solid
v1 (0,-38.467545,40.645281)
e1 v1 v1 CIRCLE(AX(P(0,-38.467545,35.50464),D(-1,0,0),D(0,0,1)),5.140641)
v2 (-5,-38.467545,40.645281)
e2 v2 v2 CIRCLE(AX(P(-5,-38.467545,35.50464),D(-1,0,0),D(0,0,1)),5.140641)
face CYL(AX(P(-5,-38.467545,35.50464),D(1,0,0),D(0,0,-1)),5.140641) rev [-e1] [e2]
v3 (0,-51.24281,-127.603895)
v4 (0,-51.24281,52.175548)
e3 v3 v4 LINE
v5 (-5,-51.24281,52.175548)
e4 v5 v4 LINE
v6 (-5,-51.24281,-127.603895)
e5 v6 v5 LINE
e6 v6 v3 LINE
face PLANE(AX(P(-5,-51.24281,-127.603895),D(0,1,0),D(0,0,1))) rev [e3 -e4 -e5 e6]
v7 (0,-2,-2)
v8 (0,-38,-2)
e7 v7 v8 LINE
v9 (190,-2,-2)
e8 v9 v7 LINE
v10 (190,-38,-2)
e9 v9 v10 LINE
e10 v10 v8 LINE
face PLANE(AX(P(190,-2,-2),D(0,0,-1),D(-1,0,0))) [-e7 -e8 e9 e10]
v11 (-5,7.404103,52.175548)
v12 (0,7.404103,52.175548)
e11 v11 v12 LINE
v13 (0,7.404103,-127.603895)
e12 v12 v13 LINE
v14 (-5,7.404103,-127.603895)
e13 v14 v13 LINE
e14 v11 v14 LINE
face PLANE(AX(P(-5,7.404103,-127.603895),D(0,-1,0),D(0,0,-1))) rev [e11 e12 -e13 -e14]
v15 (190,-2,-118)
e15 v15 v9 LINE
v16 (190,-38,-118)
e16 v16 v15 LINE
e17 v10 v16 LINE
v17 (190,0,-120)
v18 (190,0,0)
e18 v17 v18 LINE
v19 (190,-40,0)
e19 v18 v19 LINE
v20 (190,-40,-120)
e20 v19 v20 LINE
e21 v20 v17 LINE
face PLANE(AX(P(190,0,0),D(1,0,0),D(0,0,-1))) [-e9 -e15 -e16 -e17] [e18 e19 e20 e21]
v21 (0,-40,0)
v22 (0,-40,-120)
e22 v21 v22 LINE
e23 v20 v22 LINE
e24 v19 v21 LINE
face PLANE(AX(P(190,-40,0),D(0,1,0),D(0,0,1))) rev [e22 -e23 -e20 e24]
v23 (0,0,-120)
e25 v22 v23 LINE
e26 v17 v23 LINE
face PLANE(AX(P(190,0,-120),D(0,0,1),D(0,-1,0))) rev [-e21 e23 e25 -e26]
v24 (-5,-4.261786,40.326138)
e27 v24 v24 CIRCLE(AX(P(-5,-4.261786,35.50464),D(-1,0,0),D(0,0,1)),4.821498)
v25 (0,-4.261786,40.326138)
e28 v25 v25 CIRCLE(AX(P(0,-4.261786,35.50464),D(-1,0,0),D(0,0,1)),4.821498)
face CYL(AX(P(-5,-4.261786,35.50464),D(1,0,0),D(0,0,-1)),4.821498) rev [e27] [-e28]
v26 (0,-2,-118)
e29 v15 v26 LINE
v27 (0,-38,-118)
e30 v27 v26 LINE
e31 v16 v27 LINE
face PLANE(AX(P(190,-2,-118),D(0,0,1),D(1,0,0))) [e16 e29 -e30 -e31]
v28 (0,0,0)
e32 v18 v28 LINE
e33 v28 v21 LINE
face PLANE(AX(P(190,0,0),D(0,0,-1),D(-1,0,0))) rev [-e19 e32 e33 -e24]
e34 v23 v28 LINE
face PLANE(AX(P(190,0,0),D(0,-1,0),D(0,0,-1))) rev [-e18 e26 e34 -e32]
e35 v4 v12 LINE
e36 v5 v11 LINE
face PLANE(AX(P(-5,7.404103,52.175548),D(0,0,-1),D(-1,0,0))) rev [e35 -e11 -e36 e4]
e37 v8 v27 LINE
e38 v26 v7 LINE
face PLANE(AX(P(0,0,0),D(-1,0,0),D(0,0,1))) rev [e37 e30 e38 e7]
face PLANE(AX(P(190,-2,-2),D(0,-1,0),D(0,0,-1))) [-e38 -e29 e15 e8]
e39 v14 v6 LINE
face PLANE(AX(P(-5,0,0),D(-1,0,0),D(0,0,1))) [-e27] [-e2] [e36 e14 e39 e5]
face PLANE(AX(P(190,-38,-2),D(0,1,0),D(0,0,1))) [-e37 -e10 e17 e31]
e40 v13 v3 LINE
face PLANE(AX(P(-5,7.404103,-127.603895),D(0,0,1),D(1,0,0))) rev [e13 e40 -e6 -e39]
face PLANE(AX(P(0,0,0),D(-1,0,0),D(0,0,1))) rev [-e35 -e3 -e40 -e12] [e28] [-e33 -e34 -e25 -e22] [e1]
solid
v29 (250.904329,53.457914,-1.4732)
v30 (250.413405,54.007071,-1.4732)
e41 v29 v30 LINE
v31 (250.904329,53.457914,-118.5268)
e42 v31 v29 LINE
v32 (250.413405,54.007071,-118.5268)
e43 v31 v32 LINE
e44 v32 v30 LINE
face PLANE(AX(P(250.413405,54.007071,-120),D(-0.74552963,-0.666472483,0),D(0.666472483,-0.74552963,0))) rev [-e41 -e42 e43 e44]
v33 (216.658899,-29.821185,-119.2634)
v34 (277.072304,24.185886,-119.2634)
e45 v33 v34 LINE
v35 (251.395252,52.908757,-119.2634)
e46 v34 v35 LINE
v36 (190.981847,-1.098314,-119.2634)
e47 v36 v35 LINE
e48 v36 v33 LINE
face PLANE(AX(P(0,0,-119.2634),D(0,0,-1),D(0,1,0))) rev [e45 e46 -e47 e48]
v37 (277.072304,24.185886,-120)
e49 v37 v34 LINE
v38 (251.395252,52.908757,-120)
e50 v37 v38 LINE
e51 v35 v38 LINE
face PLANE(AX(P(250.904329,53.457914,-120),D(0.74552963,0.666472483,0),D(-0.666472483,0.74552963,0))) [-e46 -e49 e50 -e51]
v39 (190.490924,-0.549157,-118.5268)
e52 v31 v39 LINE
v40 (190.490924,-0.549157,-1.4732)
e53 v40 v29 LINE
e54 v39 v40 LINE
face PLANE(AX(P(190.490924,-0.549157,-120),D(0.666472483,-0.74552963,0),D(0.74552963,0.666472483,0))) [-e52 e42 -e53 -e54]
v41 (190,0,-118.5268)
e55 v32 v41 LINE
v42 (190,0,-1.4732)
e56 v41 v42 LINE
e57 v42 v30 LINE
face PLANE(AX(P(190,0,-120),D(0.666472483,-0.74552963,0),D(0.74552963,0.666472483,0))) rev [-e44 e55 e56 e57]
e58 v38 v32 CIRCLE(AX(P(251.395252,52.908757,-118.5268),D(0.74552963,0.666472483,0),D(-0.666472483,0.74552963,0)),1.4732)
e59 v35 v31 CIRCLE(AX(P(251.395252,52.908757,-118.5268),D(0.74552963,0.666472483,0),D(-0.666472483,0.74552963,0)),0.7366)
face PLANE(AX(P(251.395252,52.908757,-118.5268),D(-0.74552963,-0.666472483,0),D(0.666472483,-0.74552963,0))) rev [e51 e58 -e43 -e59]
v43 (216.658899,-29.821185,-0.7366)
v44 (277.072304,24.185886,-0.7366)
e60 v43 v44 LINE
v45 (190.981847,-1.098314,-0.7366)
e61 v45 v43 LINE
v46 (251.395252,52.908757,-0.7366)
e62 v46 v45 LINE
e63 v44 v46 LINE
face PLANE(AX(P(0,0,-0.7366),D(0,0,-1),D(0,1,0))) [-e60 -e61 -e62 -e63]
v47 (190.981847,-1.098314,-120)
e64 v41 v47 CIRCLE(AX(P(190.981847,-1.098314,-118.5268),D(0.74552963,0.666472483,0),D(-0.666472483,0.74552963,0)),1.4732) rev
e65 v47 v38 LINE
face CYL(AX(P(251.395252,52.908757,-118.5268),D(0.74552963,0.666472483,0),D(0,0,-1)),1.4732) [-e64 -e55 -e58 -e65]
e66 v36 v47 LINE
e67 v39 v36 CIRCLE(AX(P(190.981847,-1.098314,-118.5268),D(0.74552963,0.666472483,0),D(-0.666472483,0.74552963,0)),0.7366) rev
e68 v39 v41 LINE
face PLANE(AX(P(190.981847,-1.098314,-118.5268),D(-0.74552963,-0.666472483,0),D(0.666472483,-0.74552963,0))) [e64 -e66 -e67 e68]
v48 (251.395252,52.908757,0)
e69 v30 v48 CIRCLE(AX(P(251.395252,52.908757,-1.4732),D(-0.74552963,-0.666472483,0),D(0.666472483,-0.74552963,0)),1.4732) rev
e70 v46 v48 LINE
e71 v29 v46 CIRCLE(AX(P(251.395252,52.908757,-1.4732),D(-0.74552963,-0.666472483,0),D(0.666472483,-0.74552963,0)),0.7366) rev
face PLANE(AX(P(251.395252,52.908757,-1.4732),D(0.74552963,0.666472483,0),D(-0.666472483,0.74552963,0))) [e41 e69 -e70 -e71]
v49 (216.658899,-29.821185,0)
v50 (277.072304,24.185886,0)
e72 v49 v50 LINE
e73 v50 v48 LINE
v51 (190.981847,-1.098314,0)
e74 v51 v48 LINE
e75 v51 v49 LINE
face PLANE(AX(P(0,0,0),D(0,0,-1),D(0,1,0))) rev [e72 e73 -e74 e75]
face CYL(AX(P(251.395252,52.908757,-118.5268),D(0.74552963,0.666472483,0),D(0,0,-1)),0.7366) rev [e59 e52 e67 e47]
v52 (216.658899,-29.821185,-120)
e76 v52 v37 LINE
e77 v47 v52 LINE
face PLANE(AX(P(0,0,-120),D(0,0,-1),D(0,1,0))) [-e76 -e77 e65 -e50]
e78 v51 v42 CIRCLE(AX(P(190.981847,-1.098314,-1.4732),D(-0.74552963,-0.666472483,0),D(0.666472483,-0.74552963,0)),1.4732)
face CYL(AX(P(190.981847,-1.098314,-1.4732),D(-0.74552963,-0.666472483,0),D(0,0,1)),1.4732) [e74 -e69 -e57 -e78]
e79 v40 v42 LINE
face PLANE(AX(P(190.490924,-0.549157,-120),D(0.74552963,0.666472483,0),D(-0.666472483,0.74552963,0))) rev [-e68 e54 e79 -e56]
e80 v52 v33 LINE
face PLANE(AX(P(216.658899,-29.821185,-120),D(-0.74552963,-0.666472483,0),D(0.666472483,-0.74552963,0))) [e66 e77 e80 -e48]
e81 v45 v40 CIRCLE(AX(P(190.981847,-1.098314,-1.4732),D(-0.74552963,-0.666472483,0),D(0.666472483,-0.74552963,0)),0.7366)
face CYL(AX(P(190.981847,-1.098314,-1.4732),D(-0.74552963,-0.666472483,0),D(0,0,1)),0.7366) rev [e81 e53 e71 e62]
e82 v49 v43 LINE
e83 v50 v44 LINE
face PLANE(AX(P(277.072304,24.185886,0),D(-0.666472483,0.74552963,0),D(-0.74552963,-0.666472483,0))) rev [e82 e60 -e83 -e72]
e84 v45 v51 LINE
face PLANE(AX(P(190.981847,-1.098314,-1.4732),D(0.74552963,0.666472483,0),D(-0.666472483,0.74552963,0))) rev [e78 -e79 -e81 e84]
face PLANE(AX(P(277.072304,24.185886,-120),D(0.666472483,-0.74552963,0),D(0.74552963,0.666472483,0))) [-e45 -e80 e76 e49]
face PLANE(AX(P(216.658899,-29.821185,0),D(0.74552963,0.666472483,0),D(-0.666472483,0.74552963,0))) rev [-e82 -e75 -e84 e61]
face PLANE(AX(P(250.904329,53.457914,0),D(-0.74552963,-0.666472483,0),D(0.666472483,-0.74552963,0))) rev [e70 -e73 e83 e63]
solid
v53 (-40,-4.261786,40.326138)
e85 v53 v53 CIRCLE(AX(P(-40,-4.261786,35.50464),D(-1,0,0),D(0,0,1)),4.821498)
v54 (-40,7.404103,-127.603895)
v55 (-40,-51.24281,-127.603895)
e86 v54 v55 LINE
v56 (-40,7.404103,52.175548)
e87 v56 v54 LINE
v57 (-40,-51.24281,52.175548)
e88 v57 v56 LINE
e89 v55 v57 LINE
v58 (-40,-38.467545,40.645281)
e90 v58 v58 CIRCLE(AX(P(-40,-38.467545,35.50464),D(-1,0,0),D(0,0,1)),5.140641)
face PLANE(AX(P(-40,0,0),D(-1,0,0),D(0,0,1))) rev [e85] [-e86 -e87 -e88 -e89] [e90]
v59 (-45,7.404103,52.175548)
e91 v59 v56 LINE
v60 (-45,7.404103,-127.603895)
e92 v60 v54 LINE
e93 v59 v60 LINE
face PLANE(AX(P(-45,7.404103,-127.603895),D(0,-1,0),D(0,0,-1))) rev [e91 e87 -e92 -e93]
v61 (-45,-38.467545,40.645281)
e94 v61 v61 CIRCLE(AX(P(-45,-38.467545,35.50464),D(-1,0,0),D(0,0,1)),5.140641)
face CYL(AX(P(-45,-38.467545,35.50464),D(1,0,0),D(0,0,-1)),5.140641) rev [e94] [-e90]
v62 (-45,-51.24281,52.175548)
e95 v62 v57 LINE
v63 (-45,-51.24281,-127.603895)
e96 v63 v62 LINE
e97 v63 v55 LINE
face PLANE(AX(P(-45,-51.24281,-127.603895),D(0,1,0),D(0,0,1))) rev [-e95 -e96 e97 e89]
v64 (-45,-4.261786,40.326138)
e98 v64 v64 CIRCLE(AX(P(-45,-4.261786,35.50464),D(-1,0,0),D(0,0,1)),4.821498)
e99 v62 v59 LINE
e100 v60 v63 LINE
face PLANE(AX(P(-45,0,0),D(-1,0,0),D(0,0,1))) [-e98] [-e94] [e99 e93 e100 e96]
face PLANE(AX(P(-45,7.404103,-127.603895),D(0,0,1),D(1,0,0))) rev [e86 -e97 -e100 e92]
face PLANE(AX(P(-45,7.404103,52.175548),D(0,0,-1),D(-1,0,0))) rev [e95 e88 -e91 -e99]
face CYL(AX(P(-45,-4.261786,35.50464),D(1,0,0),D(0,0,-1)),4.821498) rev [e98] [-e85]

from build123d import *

# Parameters (mm, degrees)
SKETCH1_W                    = 120
SKETCH1_H                    = 40
SKETCH1_W_2                  = 116
SKETCH1_H_2                  = 36
BOSS_EXTRUDE1_DEPTH          = 190
SKETCH2_W                    = 179.779443165
SKETCH2_H                    = 58.646912064
SKETCH2_R                    = 4.82149765
SKETCH2_R_2                  = 5.140640696
BOSS_EXTRUDE2_DEPTH          = 5
BOSS_EXTRUDE3_START          = 40
SKETCH2_2_W                  = 179.779443165
SKETCH2_2_H                  = 58.646912064
SKETCH2_2_R                  = 4.82149765
SKETCH2_2_R_2                = 5.140640696
BOSS_EXTRUDE3_DEPTH          = 5
BASE_FLANGE1_DEPTH           = 120
EDGE_FLANGE1_STRIP_W         = 4.4196
EDGE_FLANGE1_STRIP_H         = 0.7366
EDGE_FLANGE1_STRIP_CUT_DEPTH = 81.034210559
EDGE_FLANGE1_DEPTH           = 81.034210559
EDGE_FLANGE2_STRIP_W         = 4.4196
EDGE_FLANGE2_STRIP_H         = 0.7366
EDGE_FLANGE2_STRIP_CUT_DEPTH = 81.034210559
EDGE_FLANGE2_DEPTH           = 81.034210559


# Sheet-metal steps are written as plain solids
with BuildPart() as part:
    # Sketch1 → Boss-Extrude1 (new body)
    with BuildSketch(Plane(origin=(0, 0, 0), x_dir=(0, 0, -1), z_dir=(1, 0, 0))):
        with Locations((60, -20)):
            Rectangle(SKETCH1_W, SKETCH1_H)
        with Locations((60, -20)):
            Rectangle(SKETCH1_W_2, SKETCH1_H_2, mode=Mode.SUBTRACT)
    extrude(amount=BOSS_EXTRUDE1_DEPTH)

    # Sketch2 → Boss-Extrude2 (add)
    with BuildSketch(Plane.ZY):
        with Locations((-37.714173415, -21.919353486)):
            Rectangle(SKETCH2_W, SKETCH2_H)
        with Locations((35.504640434, -4.261786117)):
            Circle(SKETCH2_R, mode=Mode.SUBTRACT)
        with Locations((35.504640434, -38.467545112)):
            Circle(SKETCH2_R_2, mode=Mode.SUBTRACT)
    extrude(amount=BOSS_EXTRUDE2_DEPTH)


with BuildPart() as body_2:
    # Sketch2<2> → Boss-Extrude3 (new body)
    with BuildSketch(Plane.ZY.offset(BOSS_EXTRUDE3_START)):
        with Locations((-37.714173415, -21.919353486)):
            Rectangle(SKETCH2_2_W, SKETCH2_2_H)
        with Locations((35.504640434, -4.261786117)):
            Circle(SKETCH2_2_R, mode=Mode.SUBTRACT)
        with Locations((35.504640434, -38.467545112)):
            Circle(SKETCH2_2_R_2, mode=Mode.SUBTRACT)
    extrude(amount=BOSS_EXTRUDE3_DEPTH)


with BuildPart() as body_3:
    # Sketch4 → Base-Flange1 (new body)
    with BuildSketch(Plane.XY):
        Polygon((190, 0), (250.413405054, 54.007071488), (250.904328684, 53.457914362), (190.490923631, -0.549157126), align=None)
    extrude(amount=-BASE_FLANGE1_DEPTH)

    # Edge-Flange1 strip (across the edge) → Edge-Flange1 strip cut (cut)
    with BuildSketch(Plane(origin=(250.904328684, 53.457914362, 0), x_dir=(0, 0, -1), z_dir=(-0.745529630475018, -0.6664724826155866, 0))):
        with Locations((-0.7366, -0.3683)):
            Rectangle(EDGE_FLANGE1_STRIP_W, EDGE_FLANGE1_STRIP_H)
    extrude(amount=EDGE_FLANGE1_STRIP_CUT_DEPTH, mode=Mode.SUBTRACT)

    # Edge-Flange1 section (across the edge) → Edge-Flange1 (add)
    with BuildSketch(Plane(origin=(250.904328684, 53.457914362, 0), x_dir=(0, 0, -1), z_dir=(-0.745529630475018, -0.6664724826155866, 0))):
        with BuildLine():
            Line((0, 0.7366), (0, 39.2634))
            Line((0, 39.2634), (0.7366, 39.2634))
            Line((0.7366, 39.2634), (0.7366, 0.7366))
            ThreePointArc((0.7366, 0.7366), (0.952345145, 0.215745145), (1.4732, 0))
            Line((1.4732, 0), (1.4732, -0.7366))
            ThreePointArc((1.4732, -0.7366), (0.43149029, -0.30510971), (0, 0.7366))
        make_face()
    extrude(amount=EDGE_FLANGE1_DEPTH)

    # Edge-Flange2 strip (across the edge) → Edge-Flange2 strip cut (cut)
    with BuildSketch(Plane(origin=(190.490923631, -0.549157126, -120), x_dir=(0, 0, 1), z_dir=(0.745529630475018, 0.6664724826155866, 0))):
        with Locations((-0.7366, -0.3683)):
            Rectangle(EDGE_FLANGE2_STRIP_W, EDGE_FLANGE2_STRIP_H)
    extrude(amount=EDGE_FLANGE2_STRIP_CUT_DEPTH, mode=Mode.SUBTRACT)

    # Edge-Flange2 section (across the edge) → Edge-Flange2 (add)
    with BuildSketch(Plane(origin=(190.490923631, -0.549157126, -120), x_dir=(0, 0, 1), z_dir=(0.745529630475018, 0.6664724826155866, 0))):
        with BuildLine():
            Line((0, 0.7366), (0, 39.2634))
            Line((0, 39.2634), (0.7366, 39.2634))
            Line((0.7366, 39.2634), (0.7366, 0.7366))
            ThreePointArc((0.7366, 0.7366), (0.952345145, 0.215745145), (1.4732, 0))
            Line((1.4732, 0), (1.4732, -0.7366))
            ThreePointArc((1.4732, -0.7366), (0.43149029, -0.30510971), (0, 0.7366))
        make_face()
    extrude(amount=EDGE_FLANGE2_DEPTH)


solid = Compound([part.part, body_2.part, body_3.part])
